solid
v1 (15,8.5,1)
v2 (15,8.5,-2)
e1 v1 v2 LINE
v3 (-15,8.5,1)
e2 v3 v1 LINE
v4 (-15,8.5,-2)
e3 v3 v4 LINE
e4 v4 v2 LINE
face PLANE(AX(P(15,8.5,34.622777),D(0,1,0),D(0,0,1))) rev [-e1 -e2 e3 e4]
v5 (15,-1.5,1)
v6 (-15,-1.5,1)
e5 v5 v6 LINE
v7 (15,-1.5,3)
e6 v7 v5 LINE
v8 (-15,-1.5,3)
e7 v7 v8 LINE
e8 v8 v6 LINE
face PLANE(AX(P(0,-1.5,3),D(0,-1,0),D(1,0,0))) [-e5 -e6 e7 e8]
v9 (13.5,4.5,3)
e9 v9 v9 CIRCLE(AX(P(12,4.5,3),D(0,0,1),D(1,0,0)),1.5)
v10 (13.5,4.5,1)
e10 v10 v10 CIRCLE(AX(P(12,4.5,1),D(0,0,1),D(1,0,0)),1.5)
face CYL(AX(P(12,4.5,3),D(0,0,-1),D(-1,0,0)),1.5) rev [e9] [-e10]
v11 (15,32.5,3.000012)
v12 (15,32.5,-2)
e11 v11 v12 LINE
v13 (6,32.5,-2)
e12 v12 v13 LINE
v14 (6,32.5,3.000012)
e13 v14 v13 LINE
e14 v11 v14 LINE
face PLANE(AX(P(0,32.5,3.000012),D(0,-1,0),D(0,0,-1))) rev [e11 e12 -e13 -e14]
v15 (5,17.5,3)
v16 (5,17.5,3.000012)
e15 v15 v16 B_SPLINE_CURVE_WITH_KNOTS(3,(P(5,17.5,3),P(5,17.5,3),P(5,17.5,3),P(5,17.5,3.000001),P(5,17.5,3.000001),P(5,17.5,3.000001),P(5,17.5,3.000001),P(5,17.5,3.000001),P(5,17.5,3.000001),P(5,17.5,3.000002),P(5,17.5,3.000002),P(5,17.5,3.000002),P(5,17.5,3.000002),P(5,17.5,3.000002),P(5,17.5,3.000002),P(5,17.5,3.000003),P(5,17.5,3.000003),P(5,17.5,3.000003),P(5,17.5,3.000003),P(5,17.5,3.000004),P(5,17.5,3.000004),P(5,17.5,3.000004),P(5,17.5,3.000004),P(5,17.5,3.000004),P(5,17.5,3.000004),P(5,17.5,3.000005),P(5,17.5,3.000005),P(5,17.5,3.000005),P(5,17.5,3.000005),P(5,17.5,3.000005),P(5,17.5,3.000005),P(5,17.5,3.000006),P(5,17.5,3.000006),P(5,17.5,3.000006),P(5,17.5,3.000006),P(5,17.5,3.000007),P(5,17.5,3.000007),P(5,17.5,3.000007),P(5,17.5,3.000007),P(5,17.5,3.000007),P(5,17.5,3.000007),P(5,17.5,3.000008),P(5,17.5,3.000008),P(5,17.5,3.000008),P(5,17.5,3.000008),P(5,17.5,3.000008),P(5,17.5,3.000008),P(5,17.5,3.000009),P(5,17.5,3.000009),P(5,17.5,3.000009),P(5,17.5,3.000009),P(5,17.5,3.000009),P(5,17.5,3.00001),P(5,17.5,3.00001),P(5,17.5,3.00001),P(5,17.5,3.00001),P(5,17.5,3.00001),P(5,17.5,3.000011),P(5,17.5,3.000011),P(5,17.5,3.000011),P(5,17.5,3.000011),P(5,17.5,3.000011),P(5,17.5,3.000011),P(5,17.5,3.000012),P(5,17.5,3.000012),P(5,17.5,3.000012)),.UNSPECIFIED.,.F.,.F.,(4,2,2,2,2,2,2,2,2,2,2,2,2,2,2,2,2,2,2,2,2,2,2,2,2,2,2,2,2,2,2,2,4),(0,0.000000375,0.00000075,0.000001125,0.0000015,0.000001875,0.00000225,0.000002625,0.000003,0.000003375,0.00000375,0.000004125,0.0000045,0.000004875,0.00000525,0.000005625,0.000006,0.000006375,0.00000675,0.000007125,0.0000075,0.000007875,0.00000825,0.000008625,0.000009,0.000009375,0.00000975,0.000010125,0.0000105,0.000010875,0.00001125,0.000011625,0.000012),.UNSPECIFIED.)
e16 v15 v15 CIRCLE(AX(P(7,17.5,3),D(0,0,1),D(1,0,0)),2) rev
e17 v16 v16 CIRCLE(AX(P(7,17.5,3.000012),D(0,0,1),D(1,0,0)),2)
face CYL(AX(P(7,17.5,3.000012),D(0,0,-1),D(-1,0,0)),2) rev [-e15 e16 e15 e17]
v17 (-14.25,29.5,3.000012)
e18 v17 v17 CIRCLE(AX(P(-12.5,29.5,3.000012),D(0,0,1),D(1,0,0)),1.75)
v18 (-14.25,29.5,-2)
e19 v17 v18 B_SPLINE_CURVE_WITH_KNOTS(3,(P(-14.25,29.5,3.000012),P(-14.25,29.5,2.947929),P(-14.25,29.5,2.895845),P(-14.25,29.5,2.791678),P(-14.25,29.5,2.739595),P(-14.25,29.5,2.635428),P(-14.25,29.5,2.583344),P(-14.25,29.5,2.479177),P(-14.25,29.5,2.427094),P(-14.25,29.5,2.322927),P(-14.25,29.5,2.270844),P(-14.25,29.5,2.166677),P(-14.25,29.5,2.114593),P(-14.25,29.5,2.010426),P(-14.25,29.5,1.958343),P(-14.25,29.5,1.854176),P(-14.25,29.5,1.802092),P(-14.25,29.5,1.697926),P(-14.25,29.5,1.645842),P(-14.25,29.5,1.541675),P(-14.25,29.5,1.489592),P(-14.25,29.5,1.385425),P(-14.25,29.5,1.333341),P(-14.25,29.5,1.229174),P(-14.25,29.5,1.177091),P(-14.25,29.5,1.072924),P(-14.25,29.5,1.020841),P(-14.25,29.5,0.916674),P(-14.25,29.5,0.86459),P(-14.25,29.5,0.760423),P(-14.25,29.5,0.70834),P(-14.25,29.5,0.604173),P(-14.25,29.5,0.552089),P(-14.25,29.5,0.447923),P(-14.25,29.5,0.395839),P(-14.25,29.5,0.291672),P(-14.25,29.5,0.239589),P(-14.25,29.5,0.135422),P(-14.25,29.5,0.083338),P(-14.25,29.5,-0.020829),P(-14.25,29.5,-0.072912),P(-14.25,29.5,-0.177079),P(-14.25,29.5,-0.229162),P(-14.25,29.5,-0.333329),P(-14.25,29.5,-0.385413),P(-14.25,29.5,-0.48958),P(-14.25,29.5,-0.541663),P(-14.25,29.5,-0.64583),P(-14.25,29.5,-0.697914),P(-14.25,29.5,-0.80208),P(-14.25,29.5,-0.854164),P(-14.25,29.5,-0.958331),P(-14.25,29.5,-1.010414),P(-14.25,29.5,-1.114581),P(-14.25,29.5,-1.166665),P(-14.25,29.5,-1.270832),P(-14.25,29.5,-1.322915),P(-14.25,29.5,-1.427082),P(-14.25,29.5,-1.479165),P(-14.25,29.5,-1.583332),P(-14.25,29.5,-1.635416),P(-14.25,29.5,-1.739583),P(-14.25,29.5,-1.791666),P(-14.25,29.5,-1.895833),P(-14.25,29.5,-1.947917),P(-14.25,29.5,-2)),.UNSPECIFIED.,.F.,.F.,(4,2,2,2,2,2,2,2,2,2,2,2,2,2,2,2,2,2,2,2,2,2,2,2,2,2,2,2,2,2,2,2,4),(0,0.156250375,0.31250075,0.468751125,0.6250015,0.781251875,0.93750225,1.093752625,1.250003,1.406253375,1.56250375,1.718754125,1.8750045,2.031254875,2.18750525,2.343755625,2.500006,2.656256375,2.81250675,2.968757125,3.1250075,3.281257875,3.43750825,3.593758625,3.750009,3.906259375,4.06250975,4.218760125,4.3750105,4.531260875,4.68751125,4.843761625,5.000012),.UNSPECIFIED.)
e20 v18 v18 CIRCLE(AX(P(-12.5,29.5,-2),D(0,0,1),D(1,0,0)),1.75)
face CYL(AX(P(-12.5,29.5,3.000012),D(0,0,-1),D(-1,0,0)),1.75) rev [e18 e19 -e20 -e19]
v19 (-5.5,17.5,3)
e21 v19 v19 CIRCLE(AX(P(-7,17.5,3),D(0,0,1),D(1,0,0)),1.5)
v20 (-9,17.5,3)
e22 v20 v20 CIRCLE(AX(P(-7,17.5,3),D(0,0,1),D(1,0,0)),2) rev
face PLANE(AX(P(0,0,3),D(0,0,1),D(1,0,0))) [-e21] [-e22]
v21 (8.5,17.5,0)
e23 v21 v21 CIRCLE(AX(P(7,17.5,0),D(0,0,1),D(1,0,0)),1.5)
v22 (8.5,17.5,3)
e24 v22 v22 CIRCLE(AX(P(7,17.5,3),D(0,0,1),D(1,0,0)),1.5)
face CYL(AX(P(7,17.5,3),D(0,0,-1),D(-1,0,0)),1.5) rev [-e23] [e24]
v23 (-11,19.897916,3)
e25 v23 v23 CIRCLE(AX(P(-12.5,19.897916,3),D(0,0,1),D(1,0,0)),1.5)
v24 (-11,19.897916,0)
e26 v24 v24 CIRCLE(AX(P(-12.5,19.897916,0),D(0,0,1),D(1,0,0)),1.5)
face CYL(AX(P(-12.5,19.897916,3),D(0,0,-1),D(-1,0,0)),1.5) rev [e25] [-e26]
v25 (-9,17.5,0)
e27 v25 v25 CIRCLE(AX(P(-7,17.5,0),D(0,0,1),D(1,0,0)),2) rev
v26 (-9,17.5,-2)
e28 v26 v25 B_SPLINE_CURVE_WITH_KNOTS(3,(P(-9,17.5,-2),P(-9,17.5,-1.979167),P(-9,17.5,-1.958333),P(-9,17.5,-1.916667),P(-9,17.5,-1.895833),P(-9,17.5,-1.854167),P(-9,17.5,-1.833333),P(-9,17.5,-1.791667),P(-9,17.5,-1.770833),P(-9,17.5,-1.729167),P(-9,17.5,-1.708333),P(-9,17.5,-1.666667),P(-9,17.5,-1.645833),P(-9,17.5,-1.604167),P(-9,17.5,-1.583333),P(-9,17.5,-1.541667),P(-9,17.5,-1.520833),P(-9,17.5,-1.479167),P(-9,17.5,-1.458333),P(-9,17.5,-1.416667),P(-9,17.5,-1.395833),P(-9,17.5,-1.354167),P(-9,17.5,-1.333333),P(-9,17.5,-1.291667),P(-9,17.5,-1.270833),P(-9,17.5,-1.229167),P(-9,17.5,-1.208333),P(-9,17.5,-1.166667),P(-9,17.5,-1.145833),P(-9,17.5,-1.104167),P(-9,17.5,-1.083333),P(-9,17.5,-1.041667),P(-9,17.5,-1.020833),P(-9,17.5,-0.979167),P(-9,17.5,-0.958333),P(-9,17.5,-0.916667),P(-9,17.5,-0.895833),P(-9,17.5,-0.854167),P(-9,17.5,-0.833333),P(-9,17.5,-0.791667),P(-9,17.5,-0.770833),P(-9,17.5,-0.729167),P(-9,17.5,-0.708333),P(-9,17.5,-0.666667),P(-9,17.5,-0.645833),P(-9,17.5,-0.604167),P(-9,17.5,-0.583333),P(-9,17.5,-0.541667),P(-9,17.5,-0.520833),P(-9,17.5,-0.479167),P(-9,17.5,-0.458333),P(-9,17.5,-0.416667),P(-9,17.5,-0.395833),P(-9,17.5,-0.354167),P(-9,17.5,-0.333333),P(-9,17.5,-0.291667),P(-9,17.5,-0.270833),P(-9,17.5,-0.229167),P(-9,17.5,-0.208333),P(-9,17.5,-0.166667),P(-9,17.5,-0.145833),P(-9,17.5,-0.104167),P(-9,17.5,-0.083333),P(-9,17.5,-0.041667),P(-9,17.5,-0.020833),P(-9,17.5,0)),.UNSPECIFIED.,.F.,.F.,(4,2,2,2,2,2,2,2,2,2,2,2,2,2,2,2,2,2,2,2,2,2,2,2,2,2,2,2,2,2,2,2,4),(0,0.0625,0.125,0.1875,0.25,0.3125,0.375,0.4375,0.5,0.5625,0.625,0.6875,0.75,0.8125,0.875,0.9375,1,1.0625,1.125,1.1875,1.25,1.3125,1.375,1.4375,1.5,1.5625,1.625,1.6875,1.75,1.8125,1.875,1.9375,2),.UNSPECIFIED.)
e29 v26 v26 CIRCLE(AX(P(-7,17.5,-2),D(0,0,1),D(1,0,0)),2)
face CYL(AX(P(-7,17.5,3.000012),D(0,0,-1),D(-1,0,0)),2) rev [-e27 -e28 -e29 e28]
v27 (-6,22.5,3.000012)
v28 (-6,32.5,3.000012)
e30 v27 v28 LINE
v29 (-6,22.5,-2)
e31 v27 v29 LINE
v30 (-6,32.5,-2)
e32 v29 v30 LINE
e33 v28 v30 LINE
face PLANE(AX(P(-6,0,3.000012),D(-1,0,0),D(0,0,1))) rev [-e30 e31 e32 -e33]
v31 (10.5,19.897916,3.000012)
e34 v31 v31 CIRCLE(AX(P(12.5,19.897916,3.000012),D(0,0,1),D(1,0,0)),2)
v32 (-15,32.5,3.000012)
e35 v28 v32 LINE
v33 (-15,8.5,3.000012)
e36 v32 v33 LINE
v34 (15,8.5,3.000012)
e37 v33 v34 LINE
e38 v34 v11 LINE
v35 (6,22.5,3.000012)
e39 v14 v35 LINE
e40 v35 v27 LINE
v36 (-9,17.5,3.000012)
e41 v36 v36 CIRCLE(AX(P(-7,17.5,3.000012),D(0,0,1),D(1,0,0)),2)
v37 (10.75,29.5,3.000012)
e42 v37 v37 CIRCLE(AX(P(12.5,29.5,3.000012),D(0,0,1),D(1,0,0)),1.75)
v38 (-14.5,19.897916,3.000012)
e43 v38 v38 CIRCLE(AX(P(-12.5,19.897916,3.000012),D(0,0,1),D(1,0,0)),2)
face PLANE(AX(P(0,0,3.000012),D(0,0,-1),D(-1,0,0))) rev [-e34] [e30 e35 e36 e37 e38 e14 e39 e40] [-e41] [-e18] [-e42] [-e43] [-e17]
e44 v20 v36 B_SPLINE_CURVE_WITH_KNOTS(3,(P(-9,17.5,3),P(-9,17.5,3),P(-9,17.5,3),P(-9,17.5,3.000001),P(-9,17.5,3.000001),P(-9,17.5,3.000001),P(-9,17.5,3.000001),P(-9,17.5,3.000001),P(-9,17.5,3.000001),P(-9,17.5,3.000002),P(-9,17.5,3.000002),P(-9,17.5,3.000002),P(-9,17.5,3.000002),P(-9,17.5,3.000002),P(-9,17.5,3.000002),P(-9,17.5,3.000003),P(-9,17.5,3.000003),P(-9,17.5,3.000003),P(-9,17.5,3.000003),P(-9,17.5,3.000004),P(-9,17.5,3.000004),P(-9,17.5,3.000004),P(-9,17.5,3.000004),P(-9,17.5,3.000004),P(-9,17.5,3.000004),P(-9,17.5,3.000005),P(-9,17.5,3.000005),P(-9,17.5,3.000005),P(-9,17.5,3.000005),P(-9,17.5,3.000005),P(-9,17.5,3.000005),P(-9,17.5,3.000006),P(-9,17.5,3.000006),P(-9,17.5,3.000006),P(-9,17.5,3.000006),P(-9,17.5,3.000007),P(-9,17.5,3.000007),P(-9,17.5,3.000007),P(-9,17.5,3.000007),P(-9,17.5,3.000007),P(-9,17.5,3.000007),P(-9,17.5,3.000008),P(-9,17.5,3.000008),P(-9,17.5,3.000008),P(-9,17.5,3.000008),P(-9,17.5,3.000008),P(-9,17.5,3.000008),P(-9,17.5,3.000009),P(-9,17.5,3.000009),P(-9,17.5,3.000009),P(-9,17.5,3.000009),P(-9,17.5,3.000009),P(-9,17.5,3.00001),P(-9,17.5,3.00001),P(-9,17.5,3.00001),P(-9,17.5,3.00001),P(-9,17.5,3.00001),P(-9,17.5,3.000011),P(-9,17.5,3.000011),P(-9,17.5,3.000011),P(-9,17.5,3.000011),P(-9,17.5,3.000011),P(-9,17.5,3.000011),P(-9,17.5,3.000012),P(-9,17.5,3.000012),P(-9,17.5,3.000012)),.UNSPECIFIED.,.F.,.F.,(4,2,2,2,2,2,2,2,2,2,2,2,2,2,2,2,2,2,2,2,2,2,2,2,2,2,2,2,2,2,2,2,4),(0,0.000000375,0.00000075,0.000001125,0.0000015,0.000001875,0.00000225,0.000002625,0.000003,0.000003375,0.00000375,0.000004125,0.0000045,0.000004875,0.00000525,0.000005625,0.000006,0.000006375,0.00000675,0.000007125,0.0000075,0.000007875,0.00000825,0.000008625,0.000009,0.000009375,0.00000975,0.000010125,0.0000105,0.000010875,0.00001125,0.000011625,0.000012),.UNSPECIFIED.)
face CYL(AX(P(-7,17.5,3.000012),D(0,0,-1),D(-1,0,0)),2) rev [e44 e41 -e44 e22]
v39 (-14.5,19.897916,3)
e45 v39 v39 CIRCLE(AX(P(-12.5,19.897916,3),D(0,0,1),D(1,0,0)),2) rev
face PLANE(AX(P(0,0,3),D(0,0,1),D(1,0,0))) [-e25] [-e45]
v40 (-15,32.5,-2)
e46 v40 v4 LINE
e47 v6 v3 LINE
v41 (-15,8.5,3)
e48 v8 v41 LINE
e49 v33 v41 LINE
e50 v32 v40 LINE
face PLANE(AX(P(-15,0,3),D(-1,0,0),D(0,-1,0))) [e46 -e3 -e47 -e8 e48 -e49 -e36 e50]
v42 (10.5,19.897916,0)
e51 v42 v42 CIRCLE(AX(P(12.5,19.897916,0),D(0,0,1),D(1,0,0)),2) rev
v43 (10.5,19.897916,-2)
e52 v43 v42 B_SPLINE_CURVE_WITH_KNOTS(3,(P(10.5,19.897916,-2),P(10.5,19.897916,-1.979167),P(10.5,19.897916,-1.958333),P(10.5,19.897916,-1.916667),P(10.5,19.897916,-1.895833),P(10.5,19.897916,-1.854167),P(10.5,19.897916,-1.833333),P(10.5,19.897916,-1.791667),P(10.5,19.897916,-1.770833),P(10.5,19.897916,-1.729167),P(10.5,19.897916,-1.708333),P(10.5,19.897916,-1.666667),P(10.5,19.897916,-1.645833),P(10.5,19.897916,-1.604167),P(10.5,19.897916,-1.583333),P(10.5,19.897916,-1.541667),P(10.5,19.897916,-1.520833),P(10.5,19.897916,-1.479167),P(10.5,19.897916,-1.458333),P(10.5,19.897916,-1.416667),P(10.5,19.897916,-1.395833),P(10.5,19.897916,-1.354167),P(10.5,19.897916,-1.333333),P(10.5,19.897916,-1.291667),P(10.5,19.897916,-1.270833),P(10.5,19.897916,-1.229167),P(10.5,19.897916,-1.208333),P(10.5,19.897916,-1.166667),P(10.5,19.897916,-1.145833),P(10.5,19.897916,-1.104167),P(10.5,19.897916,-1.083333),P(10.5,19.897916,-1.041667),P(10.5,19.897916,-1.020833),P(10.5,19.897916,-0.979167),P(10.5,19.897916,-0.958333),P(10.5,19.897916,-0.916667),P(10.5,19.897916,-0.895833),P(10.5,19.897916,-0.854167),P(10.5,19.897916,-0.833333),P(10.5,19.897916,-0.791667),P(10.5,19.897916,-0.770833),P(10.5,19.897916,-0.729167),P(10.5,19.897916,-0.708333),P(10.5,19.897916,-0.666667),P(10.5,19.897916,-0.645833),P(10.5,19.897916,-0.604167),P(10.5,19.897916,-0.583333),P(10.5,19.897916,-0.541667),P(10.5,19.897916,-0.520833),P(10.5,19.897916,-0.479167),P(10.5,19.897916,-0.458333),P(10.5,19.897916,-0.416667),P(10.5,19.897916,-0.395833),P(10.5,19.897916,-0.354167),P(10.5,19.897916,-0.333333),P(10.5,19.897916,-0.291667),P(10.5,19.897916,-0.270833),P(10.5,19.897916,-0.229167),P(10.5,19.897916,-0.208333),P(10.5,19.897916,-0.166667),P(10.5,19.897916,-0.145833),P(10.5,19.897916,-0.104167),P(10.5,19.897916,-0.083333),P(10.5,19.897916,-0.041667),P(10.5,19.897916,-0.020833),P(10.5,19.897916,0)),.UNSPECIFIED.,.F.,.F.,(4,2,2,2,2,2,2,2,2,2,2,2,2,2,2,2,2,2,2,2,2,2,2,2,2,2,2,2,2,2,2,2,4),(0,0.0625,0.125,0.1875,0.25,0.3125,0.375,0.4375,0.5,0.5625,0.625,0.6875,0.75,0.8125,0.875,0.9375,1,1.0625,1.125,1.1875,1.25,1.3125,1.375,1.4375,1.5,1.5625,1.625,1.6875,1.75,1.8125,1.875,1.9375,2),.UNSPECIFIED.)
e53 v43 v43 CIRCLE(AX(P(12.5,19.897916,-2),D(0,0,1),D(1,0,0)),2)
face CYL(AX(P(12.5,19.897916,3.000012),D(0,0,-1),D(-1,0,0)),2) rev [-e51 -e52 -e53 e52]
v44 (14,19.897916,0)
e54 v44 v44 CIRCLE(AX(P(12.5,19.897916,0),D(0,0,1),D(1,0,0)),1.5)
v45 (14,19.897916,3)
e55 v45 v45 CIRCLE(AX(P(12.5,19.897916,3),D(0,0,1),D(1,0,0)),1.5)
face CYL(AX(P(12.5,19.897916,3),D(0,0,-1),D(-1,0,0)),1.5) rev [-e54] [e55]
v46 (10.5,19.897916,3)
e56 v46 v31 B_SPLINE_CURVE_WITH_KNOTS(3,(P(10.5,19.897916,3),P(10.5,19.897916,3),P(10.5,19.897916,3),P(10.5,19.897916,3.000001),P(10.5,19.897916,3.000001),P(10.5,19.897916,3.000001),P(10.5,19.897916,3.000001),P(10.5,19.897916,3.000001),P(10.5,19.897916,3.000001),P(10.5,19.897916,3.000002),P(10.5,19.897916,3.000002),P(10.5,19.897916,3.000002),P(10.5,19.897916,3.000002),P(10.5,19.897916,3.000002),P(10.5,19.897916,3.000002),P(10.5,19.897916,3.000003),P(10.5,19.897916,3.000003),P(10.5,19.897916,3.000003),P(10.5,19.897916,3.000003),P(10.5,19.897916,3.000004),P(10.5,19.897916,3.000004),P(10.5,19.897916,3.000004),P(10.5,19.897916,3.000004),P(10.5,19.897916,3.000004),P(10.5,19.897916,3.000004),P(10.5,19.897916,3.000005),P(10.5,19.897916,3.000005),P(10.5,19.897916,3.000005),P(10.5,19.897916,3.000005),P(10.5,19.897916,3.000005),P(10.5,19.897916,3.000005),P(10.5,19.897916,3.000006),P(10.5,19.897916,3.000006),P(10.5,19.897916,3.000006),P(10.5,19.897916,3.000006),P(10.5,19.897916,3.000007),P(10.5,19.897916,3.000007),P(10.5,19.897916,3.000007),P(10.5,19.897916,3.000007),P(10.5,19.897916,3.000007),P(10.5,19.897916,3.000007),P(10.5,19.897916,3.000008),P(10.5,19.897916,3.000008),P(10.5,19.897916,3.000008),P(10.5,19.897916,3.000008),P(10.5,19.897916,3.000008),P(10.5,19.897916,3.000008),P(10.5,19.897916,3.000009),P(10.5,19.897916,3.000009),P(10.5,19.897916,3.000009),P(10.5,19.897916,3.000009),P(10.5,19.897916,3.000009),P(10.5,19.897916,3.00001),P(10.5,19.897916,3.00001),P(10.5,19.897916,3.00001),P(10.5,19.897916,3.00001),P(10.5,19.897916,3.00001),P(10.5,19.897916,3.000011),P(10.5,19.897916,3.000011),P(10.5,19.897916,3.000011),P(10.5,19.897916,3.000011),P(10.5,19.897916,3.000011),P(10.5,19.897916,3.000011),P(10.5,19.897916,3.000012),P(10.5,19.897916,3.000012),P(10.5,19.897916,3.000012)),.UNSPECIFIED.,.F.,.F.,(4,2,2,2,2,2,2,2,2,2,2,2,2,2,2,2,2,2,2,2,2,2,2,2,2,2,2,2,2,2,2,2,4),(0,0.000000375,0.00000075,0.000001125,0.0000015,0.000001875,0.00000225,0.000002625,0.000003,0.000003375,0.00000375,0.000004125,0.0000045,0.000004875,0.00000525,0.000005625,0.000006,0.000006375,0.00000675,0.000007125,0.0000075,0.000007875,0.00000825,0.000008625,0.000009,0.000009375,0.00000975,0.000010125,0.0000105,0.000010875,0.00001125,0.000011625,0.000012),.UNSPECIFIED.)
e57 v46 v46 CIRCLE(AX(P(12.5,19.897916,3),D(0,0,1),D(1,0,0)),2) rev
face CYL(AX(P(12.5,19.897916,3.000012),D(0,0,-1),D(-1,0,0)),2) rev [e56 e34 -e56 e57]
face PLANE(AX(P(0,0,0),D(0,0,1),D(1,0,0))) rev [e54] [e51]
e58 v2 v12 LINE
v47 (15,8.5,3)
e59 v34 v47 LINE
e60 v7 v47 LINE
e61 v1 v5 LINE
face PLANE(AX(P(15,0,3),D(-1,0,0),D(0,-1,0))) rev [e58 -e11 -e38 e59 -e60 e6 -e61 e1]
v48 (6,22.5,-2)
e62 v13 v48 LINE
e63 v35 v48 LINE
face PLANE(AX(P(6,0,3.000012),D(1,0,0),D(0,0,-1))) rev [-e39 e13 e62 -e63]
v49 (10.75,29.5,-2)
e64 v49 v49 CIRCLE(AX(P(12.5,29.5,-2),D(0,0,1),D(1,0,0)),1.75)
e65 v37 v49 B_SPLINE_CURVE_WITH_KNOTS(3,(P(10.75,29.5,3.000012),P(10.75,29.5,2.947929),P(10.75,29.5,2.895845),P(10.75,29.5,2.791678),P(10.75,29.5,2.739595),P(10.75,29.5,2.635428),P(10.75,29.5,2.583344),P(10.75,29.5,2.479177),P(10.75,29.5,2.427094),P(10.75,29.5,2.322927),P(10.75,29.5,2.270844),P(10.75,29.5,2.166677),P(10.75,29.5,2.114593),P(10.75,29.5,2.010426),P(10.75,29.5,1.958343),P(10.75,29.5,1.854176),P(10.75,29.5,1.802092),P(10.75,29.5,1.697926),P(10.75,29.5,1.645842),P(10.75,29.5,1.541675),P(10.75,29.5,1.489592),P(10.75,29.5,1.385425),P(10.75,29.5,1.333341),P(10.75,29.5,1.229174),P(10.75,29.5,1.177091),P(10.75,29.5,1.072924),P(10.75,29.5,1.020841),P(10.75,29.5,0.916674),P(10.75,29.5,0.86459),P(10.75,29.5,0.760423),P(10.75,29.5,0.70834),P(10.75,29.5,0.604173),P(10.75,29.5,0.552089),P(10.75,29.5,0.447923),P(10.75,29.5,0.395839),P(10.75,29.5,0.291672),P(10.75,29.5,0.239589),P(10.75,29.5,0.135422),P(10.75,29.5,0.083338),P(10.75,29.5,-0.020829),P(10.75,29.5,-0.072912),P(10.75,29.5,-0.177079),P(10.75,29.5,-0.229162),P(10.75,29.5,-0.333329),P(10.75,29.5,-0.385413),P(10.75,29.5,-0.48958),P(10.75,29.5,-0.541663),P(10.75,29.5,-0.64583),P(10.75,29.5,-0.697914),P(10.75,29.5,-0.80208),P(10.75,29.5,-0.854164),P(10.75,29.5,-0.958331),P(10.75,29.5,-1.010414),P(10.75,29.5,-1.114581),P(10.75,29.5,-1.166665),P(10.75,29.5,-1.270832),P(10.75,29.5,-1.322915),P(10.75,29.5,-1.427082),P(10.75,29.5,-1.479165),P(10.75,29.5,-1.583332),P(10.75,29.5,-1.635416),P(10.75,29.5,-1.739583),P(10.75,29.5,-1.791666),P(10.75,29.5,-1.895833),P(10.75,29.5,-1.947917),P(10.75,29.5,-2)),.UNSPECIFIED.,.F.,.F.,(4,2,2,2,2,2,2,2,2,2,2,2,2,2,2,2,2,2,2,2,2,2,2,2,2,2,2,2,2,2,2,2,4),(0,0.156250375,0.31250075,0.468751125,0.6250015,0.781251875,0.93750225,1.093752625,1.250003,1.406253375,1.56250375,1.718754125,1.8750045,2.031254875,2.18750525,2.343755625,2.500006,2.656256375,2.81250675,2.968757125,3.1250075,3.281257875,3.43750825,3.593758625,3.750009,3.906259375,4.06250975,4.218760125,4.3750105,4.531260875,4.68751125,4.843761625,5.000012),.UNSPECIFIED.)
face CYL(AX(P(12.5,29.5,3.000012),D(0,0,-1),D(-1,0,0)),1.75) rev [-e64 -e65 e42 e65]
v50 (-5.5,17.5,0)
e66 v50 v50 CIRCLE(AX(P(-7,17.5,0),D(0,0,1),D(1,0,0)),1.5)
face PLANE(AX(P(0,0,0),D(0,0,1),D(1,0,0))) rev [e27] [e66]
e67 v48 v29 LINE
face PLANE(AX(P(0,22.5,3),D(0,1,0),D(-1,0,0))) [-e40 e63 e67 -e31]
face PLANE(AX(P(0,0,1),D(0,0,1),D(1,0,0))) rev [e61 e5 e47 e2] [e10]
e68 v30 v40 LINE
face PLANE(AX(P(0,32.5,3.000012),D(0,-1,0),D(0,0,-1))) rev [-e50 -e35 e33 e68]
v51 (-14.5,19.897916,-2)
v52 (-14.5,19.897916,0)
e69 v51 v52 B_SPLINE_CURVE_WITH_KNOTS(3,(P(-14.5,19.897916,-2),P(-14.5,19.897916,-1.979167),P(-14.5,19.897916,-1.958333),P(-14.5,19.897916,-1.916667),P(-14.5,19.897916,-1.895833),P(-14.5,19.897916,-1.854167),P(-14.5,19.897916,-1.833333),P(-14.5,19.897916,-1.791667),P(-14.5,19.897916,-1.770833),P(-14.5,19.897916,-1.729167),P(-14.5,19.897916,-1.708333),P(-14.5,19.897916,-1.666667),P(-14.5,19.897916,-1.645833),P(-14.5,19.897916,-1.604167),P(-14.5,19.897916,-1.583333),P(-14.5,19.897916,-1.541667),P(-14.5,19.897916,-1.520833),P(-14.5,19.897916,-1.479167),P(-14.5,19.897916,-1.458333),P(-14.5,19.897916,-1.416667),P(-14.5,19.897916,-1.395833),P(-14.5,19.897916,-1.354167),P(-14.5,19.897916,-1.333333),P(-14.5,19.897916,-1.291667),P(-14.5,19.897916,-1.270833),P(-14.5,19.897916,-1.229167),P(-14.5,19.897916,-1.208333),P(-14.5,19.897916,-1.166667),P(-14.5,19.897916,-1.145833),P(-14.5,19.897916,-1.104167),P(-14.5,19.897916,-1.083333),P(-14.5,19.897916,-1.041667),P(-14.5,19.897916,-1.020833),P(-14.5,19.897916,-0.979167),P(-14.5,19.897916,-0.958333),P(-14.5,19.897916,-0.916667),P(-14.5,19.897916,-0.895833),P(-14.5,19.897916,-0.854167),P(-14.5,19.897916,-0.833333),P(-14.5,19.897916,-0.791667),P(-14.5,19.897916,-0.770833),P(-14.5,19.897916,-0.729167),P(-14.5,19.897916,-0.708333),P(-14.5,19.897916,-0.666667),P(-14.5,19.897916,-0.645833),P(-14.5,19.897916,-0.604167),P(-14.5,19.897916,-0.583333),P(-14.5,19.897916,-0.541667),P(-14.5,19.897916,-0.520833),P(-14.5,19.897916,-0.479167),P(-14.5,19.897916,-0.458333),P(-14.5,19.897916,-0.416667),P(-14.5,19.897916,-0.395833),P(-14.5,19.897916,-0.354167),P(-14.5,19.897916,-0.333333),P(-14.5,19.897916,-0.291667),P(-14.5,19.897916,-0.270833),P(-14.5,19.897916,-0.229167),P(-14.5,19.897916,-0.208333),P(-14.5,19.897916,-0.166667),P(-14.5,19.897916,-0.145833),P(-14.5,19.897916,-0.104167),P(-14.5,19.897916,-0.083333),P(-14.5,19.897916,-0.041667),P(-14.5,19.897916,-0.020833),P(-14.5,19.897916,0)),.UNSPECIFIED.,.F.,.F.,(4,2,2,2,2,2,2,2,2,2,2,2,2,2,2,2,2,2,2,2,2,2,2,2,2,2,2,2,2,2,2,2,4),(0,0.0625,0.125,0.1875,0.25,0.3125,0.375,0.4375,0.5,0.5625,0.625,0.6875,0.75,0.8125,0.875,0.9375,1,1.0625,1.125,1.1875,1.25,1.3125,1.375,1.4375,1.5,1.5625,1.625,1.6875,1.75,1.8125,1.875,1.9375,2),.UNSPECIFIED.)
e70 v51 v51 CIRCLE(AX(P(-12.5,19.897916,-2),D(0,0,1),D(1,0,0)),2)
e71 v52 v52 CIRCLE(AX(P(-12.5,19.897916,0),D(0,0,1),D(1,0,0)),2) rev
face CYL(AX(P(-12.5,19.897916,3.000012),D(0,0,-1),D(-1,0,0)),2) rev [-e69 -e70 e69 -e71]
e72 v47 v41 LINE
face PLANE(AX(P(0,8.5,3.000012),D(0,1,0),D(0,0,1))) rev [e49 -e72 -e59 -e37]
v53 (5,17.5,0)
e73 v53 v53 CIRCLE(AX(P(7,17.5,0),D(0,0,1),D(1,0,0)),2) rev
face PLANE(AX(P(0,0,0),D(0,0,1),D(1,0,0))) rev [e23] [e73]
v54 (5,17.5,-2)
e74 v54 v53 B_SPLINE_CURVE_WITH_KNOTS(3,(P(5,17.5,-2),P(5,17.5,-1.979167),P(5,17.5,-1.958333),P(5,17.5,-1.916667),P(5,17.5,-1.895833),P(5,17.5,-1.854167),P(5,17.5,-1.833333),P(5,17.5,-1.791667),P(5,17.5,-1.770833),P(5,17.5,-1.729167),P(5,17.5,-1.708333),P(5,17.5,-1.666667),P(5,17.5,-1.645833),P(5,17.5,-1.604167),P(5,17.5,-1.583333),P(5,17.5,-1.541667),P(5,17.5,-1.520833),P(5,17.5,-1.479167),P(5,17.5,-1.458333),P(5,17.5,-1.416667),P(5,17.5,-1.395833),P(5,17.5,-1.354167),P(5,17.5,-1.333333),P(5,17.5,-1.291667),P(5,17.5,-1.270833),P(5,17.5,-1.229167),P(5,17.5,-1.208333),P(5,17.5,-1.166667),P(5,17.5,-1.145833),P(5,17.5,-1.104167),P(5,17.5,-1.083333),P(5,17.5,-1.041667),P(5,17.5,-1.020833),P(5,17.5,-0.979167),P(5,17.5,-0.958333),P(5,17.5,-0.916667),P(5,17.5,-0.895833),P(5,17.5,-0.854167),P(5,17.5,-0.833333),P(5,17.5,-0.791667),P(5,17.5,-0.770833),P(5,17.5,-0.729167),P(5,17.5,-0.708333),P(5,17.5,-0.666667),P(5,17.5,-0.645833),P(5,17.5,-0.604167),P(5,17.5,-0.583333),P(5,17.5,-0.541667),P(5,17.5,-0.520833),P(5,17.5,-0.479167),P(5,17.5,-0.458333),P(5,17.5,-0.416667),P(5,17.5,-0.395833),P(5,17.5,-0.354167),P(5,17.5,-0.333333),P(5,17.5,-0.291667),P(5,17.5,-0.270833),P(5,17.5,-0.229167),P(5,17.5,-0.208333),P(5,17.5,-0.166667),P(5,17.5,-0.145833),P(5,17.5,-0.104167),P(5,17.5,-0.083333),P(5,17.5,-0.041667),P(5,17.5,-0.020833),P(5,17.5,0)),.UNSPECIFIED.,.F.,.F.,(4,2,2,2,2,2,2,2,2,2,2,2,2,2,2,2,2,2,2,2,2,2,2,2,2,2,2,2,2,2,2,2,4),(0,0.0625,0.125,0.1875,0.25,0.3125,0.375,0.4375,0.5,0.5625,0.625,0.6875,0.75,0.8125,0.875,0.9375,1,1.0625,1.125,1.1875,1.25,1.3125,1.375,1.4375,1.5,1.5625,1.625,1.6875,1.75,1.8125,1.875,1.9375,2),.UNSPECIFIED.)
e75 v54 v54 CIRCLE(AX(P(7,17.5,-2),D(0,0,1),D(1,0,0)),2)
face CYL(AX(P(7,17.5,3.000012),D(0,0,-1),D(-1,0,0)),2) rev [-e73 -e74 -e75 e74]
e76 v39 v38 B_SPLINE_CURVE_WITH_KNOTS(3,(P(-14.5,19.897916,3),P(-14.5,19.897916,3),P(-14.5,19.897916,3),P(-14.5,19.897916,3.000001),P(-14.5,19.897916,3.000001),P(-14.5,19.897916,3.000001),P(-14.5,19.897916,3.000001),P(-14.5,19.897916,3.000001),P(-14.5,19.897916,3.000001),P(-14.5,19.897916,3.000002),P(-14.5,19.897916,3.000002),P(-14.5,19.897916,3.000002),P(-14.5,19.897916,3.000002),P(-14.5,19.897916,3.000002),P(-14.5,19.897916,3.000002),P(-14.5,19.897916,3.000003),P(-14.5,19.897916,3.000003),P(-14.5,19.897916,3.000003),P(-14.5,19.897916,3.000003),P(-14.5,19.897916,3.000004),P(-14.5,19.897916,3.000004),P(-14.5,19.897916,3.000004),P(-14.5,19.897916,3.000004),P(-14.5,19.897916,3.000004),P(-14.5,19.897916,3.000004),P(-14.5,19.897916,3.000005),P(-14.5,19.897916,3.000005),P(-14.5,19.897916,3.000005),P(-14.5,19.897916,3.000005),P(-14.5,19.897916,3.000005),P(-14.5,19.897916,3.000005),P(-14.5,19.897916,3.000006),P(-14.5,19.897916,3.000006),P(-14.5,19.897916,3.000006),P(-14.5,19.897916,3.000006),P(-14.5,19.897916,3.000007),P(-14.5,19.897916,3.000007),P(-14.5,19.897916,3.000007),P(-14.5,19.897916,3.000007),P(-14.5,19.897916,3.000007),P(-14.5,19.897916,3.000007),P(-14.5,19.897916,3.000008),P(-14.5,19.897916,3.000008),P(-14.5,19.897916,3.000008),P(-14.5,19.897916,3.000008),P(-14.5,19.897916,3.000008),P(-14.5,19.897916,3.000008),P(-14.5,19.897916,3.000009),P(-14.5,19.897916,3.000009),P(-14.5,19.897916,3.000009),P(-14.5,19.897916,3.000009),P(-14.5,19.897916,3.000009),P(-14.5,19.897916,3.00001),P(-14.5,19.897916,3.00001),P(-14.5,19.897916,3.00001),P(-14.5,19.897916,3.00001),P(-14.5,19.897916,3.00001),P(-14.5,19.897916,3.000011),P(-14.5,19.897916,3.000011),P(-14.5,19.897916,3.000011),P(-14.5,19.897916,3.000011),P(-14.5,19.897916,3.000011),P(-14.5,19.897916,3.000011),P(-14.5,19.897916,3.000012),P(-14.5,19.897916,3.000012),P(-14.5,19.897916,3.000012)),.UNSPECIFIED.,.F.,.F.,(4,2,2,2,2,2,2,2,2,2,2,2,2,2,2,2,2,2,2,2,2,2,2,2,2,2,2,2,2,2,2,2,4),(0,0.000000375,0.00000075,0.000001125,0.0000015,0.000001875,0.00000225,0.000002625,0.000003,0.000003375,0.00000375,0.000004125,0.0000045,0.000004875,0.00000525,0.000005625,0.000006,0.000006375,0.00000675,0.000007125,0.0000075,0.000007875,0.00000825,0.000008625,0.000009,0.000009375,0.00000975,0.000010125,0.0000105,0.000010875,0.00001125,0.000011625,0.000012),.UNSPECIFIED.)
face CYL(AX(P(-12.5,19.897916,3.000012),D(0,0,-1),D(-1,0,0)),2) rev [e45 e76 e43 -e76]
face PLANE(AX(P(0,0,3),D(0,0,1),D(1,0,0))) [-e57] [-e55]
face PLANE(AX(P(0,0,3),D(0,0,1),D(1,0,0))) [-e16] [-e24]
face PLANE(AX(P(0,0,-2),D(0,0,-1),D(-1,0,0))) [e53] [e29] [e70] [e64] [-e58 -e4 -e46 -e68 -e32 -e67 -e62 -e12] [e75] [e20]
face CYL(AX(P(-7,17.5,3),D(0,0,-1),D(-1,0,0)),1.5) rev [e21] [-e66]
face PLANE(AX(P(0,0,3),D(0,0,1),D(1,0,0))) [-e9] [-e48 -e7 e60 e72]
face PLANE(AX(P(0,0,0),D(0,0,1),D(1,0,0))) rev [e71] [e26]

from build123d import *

# Parameters (mm, degrees)
RESSALTO_EXTRUS_O2_OUTLINE_W = 30
RESSALTO_EXTRUS_O2_OUTLINE_H = 24
RESSALTO_EXTRUS_O2_OUTLINE_R = 1.5
RESSALTO_EXTRUS_O2_DEPTH     = 3
ESBO_O5_W                    = 30
ESBO_O5_H                    = 10
CORTE_EXTRUS_O2_DEPTH        = 1
RESSALTO_EXTRUS_O3_START     = -3.000012
ESBO_O6_R                    = 2
ESBO_O6_R_2                  = 1.75
RESSALTO_EXTRUS_O3_DEPTH     = 5.000012


# Read off the part's stored shape, not the designer's step: Ressalto-extrusão2
with BuildPart() as part:
    # Ressalto-extrusão2 outline → Ressalto-extrusão2 (new body)
    with BuildSketch(Plane.XY):
        with Locations((0, 10.5)):
            Rectangle(RESSALTO_EXTRUS_O2_OUTLINE_W, RESSALTO_EXTRUS_O2_OUTLINE_H)
        with Locations((12, 4.5)):
            Circle(RESSALTO_EXTRUS_O2_OUTLINE_R, mode=Mode.SUBTRACT)
        with Locations((-12.5, 19.897915762)):
            Circle(RESSALTO_EXTRUS_O2_OUTLINE_R, mode=Mode.SUBTRACT)
        with Locations((-7, 17.5)):
            Circle(RESSALTO_EXTRUS_O2_OUTLINE_R, mode=Mode.SUBTRACT)
        with Locations((7, 17.5)):
            Circle(RESSALTO_EXTRUS_O2_OUTLINE_R, mode=Mode.SUBTRACT)
        with Locations((12.5, 19.897915762)):
            Circle(RESSALTO_EXTRUS_O2_OUTLINE_R, mode=Mode.SUBTRACT)
    extrude(amount=RESSALTO_EXTRUS_O2_DEPTH)

    # Esboço5 → Corte-extrusão2 (cut)
    with BuildSketch(Plane(origin=(0, 0, 0), x_dir=(-1, 0, 0), z_dir=(0, 0, -1))):
        with Locations((0, 3.5)):
            Rectangle(ESBO_O5_W, ESBO_O5_H)
    extrude(amount=-CORTE_EXTRUS_O2_DEPTH, mode=Mode.SUBTRACT)

    # Esboço6 → Ressalto-extrusão3 (add)
    with BuildSketch(Plane(origin=(0, 0, 0), x_dir=(-1, 0, 0), z_dir=(0, 0, -1)).offset(RESSALTO_EXTRUS_O3_START)):
        Polygon((-15, 8.5), (15, 8.5), (15, 32.5), (6, 32.5), (6, 22.5), (-6, 22.5), (-6, 32.5), (-15, 32.5), align=None)
        with Locations((12.5, 19.897915762)):
            Circle(ESBO_O6_R, mode=Mode.SUBTRACT)
        with Locations((7, 17.5)):
            Circle(ESBO_O6_R, mode=Mode.SUBTRACT)
        with Locations((-7, 17.5)):
            Circle(ESBO_O6_R, mode=Mode.SUBTRACT)
        with Locations((-12.5, 19.897915762)):
            Circle(ESBO_O6_R, mode=Mode.SUBTRACT)
        with Locations((-12.5, 29.5)):
            Circle(ESBO_O6_R_2, mode=Mode.SUBTRACT)
        with Locations((12.5, 29.5)):
            Circle(ESBO_O6_R_2, mode=Mode.SUBTRACT)
    extrude(amount=RESSALTO_EXTRUS_O3_DEPTH)


solid = part.part
